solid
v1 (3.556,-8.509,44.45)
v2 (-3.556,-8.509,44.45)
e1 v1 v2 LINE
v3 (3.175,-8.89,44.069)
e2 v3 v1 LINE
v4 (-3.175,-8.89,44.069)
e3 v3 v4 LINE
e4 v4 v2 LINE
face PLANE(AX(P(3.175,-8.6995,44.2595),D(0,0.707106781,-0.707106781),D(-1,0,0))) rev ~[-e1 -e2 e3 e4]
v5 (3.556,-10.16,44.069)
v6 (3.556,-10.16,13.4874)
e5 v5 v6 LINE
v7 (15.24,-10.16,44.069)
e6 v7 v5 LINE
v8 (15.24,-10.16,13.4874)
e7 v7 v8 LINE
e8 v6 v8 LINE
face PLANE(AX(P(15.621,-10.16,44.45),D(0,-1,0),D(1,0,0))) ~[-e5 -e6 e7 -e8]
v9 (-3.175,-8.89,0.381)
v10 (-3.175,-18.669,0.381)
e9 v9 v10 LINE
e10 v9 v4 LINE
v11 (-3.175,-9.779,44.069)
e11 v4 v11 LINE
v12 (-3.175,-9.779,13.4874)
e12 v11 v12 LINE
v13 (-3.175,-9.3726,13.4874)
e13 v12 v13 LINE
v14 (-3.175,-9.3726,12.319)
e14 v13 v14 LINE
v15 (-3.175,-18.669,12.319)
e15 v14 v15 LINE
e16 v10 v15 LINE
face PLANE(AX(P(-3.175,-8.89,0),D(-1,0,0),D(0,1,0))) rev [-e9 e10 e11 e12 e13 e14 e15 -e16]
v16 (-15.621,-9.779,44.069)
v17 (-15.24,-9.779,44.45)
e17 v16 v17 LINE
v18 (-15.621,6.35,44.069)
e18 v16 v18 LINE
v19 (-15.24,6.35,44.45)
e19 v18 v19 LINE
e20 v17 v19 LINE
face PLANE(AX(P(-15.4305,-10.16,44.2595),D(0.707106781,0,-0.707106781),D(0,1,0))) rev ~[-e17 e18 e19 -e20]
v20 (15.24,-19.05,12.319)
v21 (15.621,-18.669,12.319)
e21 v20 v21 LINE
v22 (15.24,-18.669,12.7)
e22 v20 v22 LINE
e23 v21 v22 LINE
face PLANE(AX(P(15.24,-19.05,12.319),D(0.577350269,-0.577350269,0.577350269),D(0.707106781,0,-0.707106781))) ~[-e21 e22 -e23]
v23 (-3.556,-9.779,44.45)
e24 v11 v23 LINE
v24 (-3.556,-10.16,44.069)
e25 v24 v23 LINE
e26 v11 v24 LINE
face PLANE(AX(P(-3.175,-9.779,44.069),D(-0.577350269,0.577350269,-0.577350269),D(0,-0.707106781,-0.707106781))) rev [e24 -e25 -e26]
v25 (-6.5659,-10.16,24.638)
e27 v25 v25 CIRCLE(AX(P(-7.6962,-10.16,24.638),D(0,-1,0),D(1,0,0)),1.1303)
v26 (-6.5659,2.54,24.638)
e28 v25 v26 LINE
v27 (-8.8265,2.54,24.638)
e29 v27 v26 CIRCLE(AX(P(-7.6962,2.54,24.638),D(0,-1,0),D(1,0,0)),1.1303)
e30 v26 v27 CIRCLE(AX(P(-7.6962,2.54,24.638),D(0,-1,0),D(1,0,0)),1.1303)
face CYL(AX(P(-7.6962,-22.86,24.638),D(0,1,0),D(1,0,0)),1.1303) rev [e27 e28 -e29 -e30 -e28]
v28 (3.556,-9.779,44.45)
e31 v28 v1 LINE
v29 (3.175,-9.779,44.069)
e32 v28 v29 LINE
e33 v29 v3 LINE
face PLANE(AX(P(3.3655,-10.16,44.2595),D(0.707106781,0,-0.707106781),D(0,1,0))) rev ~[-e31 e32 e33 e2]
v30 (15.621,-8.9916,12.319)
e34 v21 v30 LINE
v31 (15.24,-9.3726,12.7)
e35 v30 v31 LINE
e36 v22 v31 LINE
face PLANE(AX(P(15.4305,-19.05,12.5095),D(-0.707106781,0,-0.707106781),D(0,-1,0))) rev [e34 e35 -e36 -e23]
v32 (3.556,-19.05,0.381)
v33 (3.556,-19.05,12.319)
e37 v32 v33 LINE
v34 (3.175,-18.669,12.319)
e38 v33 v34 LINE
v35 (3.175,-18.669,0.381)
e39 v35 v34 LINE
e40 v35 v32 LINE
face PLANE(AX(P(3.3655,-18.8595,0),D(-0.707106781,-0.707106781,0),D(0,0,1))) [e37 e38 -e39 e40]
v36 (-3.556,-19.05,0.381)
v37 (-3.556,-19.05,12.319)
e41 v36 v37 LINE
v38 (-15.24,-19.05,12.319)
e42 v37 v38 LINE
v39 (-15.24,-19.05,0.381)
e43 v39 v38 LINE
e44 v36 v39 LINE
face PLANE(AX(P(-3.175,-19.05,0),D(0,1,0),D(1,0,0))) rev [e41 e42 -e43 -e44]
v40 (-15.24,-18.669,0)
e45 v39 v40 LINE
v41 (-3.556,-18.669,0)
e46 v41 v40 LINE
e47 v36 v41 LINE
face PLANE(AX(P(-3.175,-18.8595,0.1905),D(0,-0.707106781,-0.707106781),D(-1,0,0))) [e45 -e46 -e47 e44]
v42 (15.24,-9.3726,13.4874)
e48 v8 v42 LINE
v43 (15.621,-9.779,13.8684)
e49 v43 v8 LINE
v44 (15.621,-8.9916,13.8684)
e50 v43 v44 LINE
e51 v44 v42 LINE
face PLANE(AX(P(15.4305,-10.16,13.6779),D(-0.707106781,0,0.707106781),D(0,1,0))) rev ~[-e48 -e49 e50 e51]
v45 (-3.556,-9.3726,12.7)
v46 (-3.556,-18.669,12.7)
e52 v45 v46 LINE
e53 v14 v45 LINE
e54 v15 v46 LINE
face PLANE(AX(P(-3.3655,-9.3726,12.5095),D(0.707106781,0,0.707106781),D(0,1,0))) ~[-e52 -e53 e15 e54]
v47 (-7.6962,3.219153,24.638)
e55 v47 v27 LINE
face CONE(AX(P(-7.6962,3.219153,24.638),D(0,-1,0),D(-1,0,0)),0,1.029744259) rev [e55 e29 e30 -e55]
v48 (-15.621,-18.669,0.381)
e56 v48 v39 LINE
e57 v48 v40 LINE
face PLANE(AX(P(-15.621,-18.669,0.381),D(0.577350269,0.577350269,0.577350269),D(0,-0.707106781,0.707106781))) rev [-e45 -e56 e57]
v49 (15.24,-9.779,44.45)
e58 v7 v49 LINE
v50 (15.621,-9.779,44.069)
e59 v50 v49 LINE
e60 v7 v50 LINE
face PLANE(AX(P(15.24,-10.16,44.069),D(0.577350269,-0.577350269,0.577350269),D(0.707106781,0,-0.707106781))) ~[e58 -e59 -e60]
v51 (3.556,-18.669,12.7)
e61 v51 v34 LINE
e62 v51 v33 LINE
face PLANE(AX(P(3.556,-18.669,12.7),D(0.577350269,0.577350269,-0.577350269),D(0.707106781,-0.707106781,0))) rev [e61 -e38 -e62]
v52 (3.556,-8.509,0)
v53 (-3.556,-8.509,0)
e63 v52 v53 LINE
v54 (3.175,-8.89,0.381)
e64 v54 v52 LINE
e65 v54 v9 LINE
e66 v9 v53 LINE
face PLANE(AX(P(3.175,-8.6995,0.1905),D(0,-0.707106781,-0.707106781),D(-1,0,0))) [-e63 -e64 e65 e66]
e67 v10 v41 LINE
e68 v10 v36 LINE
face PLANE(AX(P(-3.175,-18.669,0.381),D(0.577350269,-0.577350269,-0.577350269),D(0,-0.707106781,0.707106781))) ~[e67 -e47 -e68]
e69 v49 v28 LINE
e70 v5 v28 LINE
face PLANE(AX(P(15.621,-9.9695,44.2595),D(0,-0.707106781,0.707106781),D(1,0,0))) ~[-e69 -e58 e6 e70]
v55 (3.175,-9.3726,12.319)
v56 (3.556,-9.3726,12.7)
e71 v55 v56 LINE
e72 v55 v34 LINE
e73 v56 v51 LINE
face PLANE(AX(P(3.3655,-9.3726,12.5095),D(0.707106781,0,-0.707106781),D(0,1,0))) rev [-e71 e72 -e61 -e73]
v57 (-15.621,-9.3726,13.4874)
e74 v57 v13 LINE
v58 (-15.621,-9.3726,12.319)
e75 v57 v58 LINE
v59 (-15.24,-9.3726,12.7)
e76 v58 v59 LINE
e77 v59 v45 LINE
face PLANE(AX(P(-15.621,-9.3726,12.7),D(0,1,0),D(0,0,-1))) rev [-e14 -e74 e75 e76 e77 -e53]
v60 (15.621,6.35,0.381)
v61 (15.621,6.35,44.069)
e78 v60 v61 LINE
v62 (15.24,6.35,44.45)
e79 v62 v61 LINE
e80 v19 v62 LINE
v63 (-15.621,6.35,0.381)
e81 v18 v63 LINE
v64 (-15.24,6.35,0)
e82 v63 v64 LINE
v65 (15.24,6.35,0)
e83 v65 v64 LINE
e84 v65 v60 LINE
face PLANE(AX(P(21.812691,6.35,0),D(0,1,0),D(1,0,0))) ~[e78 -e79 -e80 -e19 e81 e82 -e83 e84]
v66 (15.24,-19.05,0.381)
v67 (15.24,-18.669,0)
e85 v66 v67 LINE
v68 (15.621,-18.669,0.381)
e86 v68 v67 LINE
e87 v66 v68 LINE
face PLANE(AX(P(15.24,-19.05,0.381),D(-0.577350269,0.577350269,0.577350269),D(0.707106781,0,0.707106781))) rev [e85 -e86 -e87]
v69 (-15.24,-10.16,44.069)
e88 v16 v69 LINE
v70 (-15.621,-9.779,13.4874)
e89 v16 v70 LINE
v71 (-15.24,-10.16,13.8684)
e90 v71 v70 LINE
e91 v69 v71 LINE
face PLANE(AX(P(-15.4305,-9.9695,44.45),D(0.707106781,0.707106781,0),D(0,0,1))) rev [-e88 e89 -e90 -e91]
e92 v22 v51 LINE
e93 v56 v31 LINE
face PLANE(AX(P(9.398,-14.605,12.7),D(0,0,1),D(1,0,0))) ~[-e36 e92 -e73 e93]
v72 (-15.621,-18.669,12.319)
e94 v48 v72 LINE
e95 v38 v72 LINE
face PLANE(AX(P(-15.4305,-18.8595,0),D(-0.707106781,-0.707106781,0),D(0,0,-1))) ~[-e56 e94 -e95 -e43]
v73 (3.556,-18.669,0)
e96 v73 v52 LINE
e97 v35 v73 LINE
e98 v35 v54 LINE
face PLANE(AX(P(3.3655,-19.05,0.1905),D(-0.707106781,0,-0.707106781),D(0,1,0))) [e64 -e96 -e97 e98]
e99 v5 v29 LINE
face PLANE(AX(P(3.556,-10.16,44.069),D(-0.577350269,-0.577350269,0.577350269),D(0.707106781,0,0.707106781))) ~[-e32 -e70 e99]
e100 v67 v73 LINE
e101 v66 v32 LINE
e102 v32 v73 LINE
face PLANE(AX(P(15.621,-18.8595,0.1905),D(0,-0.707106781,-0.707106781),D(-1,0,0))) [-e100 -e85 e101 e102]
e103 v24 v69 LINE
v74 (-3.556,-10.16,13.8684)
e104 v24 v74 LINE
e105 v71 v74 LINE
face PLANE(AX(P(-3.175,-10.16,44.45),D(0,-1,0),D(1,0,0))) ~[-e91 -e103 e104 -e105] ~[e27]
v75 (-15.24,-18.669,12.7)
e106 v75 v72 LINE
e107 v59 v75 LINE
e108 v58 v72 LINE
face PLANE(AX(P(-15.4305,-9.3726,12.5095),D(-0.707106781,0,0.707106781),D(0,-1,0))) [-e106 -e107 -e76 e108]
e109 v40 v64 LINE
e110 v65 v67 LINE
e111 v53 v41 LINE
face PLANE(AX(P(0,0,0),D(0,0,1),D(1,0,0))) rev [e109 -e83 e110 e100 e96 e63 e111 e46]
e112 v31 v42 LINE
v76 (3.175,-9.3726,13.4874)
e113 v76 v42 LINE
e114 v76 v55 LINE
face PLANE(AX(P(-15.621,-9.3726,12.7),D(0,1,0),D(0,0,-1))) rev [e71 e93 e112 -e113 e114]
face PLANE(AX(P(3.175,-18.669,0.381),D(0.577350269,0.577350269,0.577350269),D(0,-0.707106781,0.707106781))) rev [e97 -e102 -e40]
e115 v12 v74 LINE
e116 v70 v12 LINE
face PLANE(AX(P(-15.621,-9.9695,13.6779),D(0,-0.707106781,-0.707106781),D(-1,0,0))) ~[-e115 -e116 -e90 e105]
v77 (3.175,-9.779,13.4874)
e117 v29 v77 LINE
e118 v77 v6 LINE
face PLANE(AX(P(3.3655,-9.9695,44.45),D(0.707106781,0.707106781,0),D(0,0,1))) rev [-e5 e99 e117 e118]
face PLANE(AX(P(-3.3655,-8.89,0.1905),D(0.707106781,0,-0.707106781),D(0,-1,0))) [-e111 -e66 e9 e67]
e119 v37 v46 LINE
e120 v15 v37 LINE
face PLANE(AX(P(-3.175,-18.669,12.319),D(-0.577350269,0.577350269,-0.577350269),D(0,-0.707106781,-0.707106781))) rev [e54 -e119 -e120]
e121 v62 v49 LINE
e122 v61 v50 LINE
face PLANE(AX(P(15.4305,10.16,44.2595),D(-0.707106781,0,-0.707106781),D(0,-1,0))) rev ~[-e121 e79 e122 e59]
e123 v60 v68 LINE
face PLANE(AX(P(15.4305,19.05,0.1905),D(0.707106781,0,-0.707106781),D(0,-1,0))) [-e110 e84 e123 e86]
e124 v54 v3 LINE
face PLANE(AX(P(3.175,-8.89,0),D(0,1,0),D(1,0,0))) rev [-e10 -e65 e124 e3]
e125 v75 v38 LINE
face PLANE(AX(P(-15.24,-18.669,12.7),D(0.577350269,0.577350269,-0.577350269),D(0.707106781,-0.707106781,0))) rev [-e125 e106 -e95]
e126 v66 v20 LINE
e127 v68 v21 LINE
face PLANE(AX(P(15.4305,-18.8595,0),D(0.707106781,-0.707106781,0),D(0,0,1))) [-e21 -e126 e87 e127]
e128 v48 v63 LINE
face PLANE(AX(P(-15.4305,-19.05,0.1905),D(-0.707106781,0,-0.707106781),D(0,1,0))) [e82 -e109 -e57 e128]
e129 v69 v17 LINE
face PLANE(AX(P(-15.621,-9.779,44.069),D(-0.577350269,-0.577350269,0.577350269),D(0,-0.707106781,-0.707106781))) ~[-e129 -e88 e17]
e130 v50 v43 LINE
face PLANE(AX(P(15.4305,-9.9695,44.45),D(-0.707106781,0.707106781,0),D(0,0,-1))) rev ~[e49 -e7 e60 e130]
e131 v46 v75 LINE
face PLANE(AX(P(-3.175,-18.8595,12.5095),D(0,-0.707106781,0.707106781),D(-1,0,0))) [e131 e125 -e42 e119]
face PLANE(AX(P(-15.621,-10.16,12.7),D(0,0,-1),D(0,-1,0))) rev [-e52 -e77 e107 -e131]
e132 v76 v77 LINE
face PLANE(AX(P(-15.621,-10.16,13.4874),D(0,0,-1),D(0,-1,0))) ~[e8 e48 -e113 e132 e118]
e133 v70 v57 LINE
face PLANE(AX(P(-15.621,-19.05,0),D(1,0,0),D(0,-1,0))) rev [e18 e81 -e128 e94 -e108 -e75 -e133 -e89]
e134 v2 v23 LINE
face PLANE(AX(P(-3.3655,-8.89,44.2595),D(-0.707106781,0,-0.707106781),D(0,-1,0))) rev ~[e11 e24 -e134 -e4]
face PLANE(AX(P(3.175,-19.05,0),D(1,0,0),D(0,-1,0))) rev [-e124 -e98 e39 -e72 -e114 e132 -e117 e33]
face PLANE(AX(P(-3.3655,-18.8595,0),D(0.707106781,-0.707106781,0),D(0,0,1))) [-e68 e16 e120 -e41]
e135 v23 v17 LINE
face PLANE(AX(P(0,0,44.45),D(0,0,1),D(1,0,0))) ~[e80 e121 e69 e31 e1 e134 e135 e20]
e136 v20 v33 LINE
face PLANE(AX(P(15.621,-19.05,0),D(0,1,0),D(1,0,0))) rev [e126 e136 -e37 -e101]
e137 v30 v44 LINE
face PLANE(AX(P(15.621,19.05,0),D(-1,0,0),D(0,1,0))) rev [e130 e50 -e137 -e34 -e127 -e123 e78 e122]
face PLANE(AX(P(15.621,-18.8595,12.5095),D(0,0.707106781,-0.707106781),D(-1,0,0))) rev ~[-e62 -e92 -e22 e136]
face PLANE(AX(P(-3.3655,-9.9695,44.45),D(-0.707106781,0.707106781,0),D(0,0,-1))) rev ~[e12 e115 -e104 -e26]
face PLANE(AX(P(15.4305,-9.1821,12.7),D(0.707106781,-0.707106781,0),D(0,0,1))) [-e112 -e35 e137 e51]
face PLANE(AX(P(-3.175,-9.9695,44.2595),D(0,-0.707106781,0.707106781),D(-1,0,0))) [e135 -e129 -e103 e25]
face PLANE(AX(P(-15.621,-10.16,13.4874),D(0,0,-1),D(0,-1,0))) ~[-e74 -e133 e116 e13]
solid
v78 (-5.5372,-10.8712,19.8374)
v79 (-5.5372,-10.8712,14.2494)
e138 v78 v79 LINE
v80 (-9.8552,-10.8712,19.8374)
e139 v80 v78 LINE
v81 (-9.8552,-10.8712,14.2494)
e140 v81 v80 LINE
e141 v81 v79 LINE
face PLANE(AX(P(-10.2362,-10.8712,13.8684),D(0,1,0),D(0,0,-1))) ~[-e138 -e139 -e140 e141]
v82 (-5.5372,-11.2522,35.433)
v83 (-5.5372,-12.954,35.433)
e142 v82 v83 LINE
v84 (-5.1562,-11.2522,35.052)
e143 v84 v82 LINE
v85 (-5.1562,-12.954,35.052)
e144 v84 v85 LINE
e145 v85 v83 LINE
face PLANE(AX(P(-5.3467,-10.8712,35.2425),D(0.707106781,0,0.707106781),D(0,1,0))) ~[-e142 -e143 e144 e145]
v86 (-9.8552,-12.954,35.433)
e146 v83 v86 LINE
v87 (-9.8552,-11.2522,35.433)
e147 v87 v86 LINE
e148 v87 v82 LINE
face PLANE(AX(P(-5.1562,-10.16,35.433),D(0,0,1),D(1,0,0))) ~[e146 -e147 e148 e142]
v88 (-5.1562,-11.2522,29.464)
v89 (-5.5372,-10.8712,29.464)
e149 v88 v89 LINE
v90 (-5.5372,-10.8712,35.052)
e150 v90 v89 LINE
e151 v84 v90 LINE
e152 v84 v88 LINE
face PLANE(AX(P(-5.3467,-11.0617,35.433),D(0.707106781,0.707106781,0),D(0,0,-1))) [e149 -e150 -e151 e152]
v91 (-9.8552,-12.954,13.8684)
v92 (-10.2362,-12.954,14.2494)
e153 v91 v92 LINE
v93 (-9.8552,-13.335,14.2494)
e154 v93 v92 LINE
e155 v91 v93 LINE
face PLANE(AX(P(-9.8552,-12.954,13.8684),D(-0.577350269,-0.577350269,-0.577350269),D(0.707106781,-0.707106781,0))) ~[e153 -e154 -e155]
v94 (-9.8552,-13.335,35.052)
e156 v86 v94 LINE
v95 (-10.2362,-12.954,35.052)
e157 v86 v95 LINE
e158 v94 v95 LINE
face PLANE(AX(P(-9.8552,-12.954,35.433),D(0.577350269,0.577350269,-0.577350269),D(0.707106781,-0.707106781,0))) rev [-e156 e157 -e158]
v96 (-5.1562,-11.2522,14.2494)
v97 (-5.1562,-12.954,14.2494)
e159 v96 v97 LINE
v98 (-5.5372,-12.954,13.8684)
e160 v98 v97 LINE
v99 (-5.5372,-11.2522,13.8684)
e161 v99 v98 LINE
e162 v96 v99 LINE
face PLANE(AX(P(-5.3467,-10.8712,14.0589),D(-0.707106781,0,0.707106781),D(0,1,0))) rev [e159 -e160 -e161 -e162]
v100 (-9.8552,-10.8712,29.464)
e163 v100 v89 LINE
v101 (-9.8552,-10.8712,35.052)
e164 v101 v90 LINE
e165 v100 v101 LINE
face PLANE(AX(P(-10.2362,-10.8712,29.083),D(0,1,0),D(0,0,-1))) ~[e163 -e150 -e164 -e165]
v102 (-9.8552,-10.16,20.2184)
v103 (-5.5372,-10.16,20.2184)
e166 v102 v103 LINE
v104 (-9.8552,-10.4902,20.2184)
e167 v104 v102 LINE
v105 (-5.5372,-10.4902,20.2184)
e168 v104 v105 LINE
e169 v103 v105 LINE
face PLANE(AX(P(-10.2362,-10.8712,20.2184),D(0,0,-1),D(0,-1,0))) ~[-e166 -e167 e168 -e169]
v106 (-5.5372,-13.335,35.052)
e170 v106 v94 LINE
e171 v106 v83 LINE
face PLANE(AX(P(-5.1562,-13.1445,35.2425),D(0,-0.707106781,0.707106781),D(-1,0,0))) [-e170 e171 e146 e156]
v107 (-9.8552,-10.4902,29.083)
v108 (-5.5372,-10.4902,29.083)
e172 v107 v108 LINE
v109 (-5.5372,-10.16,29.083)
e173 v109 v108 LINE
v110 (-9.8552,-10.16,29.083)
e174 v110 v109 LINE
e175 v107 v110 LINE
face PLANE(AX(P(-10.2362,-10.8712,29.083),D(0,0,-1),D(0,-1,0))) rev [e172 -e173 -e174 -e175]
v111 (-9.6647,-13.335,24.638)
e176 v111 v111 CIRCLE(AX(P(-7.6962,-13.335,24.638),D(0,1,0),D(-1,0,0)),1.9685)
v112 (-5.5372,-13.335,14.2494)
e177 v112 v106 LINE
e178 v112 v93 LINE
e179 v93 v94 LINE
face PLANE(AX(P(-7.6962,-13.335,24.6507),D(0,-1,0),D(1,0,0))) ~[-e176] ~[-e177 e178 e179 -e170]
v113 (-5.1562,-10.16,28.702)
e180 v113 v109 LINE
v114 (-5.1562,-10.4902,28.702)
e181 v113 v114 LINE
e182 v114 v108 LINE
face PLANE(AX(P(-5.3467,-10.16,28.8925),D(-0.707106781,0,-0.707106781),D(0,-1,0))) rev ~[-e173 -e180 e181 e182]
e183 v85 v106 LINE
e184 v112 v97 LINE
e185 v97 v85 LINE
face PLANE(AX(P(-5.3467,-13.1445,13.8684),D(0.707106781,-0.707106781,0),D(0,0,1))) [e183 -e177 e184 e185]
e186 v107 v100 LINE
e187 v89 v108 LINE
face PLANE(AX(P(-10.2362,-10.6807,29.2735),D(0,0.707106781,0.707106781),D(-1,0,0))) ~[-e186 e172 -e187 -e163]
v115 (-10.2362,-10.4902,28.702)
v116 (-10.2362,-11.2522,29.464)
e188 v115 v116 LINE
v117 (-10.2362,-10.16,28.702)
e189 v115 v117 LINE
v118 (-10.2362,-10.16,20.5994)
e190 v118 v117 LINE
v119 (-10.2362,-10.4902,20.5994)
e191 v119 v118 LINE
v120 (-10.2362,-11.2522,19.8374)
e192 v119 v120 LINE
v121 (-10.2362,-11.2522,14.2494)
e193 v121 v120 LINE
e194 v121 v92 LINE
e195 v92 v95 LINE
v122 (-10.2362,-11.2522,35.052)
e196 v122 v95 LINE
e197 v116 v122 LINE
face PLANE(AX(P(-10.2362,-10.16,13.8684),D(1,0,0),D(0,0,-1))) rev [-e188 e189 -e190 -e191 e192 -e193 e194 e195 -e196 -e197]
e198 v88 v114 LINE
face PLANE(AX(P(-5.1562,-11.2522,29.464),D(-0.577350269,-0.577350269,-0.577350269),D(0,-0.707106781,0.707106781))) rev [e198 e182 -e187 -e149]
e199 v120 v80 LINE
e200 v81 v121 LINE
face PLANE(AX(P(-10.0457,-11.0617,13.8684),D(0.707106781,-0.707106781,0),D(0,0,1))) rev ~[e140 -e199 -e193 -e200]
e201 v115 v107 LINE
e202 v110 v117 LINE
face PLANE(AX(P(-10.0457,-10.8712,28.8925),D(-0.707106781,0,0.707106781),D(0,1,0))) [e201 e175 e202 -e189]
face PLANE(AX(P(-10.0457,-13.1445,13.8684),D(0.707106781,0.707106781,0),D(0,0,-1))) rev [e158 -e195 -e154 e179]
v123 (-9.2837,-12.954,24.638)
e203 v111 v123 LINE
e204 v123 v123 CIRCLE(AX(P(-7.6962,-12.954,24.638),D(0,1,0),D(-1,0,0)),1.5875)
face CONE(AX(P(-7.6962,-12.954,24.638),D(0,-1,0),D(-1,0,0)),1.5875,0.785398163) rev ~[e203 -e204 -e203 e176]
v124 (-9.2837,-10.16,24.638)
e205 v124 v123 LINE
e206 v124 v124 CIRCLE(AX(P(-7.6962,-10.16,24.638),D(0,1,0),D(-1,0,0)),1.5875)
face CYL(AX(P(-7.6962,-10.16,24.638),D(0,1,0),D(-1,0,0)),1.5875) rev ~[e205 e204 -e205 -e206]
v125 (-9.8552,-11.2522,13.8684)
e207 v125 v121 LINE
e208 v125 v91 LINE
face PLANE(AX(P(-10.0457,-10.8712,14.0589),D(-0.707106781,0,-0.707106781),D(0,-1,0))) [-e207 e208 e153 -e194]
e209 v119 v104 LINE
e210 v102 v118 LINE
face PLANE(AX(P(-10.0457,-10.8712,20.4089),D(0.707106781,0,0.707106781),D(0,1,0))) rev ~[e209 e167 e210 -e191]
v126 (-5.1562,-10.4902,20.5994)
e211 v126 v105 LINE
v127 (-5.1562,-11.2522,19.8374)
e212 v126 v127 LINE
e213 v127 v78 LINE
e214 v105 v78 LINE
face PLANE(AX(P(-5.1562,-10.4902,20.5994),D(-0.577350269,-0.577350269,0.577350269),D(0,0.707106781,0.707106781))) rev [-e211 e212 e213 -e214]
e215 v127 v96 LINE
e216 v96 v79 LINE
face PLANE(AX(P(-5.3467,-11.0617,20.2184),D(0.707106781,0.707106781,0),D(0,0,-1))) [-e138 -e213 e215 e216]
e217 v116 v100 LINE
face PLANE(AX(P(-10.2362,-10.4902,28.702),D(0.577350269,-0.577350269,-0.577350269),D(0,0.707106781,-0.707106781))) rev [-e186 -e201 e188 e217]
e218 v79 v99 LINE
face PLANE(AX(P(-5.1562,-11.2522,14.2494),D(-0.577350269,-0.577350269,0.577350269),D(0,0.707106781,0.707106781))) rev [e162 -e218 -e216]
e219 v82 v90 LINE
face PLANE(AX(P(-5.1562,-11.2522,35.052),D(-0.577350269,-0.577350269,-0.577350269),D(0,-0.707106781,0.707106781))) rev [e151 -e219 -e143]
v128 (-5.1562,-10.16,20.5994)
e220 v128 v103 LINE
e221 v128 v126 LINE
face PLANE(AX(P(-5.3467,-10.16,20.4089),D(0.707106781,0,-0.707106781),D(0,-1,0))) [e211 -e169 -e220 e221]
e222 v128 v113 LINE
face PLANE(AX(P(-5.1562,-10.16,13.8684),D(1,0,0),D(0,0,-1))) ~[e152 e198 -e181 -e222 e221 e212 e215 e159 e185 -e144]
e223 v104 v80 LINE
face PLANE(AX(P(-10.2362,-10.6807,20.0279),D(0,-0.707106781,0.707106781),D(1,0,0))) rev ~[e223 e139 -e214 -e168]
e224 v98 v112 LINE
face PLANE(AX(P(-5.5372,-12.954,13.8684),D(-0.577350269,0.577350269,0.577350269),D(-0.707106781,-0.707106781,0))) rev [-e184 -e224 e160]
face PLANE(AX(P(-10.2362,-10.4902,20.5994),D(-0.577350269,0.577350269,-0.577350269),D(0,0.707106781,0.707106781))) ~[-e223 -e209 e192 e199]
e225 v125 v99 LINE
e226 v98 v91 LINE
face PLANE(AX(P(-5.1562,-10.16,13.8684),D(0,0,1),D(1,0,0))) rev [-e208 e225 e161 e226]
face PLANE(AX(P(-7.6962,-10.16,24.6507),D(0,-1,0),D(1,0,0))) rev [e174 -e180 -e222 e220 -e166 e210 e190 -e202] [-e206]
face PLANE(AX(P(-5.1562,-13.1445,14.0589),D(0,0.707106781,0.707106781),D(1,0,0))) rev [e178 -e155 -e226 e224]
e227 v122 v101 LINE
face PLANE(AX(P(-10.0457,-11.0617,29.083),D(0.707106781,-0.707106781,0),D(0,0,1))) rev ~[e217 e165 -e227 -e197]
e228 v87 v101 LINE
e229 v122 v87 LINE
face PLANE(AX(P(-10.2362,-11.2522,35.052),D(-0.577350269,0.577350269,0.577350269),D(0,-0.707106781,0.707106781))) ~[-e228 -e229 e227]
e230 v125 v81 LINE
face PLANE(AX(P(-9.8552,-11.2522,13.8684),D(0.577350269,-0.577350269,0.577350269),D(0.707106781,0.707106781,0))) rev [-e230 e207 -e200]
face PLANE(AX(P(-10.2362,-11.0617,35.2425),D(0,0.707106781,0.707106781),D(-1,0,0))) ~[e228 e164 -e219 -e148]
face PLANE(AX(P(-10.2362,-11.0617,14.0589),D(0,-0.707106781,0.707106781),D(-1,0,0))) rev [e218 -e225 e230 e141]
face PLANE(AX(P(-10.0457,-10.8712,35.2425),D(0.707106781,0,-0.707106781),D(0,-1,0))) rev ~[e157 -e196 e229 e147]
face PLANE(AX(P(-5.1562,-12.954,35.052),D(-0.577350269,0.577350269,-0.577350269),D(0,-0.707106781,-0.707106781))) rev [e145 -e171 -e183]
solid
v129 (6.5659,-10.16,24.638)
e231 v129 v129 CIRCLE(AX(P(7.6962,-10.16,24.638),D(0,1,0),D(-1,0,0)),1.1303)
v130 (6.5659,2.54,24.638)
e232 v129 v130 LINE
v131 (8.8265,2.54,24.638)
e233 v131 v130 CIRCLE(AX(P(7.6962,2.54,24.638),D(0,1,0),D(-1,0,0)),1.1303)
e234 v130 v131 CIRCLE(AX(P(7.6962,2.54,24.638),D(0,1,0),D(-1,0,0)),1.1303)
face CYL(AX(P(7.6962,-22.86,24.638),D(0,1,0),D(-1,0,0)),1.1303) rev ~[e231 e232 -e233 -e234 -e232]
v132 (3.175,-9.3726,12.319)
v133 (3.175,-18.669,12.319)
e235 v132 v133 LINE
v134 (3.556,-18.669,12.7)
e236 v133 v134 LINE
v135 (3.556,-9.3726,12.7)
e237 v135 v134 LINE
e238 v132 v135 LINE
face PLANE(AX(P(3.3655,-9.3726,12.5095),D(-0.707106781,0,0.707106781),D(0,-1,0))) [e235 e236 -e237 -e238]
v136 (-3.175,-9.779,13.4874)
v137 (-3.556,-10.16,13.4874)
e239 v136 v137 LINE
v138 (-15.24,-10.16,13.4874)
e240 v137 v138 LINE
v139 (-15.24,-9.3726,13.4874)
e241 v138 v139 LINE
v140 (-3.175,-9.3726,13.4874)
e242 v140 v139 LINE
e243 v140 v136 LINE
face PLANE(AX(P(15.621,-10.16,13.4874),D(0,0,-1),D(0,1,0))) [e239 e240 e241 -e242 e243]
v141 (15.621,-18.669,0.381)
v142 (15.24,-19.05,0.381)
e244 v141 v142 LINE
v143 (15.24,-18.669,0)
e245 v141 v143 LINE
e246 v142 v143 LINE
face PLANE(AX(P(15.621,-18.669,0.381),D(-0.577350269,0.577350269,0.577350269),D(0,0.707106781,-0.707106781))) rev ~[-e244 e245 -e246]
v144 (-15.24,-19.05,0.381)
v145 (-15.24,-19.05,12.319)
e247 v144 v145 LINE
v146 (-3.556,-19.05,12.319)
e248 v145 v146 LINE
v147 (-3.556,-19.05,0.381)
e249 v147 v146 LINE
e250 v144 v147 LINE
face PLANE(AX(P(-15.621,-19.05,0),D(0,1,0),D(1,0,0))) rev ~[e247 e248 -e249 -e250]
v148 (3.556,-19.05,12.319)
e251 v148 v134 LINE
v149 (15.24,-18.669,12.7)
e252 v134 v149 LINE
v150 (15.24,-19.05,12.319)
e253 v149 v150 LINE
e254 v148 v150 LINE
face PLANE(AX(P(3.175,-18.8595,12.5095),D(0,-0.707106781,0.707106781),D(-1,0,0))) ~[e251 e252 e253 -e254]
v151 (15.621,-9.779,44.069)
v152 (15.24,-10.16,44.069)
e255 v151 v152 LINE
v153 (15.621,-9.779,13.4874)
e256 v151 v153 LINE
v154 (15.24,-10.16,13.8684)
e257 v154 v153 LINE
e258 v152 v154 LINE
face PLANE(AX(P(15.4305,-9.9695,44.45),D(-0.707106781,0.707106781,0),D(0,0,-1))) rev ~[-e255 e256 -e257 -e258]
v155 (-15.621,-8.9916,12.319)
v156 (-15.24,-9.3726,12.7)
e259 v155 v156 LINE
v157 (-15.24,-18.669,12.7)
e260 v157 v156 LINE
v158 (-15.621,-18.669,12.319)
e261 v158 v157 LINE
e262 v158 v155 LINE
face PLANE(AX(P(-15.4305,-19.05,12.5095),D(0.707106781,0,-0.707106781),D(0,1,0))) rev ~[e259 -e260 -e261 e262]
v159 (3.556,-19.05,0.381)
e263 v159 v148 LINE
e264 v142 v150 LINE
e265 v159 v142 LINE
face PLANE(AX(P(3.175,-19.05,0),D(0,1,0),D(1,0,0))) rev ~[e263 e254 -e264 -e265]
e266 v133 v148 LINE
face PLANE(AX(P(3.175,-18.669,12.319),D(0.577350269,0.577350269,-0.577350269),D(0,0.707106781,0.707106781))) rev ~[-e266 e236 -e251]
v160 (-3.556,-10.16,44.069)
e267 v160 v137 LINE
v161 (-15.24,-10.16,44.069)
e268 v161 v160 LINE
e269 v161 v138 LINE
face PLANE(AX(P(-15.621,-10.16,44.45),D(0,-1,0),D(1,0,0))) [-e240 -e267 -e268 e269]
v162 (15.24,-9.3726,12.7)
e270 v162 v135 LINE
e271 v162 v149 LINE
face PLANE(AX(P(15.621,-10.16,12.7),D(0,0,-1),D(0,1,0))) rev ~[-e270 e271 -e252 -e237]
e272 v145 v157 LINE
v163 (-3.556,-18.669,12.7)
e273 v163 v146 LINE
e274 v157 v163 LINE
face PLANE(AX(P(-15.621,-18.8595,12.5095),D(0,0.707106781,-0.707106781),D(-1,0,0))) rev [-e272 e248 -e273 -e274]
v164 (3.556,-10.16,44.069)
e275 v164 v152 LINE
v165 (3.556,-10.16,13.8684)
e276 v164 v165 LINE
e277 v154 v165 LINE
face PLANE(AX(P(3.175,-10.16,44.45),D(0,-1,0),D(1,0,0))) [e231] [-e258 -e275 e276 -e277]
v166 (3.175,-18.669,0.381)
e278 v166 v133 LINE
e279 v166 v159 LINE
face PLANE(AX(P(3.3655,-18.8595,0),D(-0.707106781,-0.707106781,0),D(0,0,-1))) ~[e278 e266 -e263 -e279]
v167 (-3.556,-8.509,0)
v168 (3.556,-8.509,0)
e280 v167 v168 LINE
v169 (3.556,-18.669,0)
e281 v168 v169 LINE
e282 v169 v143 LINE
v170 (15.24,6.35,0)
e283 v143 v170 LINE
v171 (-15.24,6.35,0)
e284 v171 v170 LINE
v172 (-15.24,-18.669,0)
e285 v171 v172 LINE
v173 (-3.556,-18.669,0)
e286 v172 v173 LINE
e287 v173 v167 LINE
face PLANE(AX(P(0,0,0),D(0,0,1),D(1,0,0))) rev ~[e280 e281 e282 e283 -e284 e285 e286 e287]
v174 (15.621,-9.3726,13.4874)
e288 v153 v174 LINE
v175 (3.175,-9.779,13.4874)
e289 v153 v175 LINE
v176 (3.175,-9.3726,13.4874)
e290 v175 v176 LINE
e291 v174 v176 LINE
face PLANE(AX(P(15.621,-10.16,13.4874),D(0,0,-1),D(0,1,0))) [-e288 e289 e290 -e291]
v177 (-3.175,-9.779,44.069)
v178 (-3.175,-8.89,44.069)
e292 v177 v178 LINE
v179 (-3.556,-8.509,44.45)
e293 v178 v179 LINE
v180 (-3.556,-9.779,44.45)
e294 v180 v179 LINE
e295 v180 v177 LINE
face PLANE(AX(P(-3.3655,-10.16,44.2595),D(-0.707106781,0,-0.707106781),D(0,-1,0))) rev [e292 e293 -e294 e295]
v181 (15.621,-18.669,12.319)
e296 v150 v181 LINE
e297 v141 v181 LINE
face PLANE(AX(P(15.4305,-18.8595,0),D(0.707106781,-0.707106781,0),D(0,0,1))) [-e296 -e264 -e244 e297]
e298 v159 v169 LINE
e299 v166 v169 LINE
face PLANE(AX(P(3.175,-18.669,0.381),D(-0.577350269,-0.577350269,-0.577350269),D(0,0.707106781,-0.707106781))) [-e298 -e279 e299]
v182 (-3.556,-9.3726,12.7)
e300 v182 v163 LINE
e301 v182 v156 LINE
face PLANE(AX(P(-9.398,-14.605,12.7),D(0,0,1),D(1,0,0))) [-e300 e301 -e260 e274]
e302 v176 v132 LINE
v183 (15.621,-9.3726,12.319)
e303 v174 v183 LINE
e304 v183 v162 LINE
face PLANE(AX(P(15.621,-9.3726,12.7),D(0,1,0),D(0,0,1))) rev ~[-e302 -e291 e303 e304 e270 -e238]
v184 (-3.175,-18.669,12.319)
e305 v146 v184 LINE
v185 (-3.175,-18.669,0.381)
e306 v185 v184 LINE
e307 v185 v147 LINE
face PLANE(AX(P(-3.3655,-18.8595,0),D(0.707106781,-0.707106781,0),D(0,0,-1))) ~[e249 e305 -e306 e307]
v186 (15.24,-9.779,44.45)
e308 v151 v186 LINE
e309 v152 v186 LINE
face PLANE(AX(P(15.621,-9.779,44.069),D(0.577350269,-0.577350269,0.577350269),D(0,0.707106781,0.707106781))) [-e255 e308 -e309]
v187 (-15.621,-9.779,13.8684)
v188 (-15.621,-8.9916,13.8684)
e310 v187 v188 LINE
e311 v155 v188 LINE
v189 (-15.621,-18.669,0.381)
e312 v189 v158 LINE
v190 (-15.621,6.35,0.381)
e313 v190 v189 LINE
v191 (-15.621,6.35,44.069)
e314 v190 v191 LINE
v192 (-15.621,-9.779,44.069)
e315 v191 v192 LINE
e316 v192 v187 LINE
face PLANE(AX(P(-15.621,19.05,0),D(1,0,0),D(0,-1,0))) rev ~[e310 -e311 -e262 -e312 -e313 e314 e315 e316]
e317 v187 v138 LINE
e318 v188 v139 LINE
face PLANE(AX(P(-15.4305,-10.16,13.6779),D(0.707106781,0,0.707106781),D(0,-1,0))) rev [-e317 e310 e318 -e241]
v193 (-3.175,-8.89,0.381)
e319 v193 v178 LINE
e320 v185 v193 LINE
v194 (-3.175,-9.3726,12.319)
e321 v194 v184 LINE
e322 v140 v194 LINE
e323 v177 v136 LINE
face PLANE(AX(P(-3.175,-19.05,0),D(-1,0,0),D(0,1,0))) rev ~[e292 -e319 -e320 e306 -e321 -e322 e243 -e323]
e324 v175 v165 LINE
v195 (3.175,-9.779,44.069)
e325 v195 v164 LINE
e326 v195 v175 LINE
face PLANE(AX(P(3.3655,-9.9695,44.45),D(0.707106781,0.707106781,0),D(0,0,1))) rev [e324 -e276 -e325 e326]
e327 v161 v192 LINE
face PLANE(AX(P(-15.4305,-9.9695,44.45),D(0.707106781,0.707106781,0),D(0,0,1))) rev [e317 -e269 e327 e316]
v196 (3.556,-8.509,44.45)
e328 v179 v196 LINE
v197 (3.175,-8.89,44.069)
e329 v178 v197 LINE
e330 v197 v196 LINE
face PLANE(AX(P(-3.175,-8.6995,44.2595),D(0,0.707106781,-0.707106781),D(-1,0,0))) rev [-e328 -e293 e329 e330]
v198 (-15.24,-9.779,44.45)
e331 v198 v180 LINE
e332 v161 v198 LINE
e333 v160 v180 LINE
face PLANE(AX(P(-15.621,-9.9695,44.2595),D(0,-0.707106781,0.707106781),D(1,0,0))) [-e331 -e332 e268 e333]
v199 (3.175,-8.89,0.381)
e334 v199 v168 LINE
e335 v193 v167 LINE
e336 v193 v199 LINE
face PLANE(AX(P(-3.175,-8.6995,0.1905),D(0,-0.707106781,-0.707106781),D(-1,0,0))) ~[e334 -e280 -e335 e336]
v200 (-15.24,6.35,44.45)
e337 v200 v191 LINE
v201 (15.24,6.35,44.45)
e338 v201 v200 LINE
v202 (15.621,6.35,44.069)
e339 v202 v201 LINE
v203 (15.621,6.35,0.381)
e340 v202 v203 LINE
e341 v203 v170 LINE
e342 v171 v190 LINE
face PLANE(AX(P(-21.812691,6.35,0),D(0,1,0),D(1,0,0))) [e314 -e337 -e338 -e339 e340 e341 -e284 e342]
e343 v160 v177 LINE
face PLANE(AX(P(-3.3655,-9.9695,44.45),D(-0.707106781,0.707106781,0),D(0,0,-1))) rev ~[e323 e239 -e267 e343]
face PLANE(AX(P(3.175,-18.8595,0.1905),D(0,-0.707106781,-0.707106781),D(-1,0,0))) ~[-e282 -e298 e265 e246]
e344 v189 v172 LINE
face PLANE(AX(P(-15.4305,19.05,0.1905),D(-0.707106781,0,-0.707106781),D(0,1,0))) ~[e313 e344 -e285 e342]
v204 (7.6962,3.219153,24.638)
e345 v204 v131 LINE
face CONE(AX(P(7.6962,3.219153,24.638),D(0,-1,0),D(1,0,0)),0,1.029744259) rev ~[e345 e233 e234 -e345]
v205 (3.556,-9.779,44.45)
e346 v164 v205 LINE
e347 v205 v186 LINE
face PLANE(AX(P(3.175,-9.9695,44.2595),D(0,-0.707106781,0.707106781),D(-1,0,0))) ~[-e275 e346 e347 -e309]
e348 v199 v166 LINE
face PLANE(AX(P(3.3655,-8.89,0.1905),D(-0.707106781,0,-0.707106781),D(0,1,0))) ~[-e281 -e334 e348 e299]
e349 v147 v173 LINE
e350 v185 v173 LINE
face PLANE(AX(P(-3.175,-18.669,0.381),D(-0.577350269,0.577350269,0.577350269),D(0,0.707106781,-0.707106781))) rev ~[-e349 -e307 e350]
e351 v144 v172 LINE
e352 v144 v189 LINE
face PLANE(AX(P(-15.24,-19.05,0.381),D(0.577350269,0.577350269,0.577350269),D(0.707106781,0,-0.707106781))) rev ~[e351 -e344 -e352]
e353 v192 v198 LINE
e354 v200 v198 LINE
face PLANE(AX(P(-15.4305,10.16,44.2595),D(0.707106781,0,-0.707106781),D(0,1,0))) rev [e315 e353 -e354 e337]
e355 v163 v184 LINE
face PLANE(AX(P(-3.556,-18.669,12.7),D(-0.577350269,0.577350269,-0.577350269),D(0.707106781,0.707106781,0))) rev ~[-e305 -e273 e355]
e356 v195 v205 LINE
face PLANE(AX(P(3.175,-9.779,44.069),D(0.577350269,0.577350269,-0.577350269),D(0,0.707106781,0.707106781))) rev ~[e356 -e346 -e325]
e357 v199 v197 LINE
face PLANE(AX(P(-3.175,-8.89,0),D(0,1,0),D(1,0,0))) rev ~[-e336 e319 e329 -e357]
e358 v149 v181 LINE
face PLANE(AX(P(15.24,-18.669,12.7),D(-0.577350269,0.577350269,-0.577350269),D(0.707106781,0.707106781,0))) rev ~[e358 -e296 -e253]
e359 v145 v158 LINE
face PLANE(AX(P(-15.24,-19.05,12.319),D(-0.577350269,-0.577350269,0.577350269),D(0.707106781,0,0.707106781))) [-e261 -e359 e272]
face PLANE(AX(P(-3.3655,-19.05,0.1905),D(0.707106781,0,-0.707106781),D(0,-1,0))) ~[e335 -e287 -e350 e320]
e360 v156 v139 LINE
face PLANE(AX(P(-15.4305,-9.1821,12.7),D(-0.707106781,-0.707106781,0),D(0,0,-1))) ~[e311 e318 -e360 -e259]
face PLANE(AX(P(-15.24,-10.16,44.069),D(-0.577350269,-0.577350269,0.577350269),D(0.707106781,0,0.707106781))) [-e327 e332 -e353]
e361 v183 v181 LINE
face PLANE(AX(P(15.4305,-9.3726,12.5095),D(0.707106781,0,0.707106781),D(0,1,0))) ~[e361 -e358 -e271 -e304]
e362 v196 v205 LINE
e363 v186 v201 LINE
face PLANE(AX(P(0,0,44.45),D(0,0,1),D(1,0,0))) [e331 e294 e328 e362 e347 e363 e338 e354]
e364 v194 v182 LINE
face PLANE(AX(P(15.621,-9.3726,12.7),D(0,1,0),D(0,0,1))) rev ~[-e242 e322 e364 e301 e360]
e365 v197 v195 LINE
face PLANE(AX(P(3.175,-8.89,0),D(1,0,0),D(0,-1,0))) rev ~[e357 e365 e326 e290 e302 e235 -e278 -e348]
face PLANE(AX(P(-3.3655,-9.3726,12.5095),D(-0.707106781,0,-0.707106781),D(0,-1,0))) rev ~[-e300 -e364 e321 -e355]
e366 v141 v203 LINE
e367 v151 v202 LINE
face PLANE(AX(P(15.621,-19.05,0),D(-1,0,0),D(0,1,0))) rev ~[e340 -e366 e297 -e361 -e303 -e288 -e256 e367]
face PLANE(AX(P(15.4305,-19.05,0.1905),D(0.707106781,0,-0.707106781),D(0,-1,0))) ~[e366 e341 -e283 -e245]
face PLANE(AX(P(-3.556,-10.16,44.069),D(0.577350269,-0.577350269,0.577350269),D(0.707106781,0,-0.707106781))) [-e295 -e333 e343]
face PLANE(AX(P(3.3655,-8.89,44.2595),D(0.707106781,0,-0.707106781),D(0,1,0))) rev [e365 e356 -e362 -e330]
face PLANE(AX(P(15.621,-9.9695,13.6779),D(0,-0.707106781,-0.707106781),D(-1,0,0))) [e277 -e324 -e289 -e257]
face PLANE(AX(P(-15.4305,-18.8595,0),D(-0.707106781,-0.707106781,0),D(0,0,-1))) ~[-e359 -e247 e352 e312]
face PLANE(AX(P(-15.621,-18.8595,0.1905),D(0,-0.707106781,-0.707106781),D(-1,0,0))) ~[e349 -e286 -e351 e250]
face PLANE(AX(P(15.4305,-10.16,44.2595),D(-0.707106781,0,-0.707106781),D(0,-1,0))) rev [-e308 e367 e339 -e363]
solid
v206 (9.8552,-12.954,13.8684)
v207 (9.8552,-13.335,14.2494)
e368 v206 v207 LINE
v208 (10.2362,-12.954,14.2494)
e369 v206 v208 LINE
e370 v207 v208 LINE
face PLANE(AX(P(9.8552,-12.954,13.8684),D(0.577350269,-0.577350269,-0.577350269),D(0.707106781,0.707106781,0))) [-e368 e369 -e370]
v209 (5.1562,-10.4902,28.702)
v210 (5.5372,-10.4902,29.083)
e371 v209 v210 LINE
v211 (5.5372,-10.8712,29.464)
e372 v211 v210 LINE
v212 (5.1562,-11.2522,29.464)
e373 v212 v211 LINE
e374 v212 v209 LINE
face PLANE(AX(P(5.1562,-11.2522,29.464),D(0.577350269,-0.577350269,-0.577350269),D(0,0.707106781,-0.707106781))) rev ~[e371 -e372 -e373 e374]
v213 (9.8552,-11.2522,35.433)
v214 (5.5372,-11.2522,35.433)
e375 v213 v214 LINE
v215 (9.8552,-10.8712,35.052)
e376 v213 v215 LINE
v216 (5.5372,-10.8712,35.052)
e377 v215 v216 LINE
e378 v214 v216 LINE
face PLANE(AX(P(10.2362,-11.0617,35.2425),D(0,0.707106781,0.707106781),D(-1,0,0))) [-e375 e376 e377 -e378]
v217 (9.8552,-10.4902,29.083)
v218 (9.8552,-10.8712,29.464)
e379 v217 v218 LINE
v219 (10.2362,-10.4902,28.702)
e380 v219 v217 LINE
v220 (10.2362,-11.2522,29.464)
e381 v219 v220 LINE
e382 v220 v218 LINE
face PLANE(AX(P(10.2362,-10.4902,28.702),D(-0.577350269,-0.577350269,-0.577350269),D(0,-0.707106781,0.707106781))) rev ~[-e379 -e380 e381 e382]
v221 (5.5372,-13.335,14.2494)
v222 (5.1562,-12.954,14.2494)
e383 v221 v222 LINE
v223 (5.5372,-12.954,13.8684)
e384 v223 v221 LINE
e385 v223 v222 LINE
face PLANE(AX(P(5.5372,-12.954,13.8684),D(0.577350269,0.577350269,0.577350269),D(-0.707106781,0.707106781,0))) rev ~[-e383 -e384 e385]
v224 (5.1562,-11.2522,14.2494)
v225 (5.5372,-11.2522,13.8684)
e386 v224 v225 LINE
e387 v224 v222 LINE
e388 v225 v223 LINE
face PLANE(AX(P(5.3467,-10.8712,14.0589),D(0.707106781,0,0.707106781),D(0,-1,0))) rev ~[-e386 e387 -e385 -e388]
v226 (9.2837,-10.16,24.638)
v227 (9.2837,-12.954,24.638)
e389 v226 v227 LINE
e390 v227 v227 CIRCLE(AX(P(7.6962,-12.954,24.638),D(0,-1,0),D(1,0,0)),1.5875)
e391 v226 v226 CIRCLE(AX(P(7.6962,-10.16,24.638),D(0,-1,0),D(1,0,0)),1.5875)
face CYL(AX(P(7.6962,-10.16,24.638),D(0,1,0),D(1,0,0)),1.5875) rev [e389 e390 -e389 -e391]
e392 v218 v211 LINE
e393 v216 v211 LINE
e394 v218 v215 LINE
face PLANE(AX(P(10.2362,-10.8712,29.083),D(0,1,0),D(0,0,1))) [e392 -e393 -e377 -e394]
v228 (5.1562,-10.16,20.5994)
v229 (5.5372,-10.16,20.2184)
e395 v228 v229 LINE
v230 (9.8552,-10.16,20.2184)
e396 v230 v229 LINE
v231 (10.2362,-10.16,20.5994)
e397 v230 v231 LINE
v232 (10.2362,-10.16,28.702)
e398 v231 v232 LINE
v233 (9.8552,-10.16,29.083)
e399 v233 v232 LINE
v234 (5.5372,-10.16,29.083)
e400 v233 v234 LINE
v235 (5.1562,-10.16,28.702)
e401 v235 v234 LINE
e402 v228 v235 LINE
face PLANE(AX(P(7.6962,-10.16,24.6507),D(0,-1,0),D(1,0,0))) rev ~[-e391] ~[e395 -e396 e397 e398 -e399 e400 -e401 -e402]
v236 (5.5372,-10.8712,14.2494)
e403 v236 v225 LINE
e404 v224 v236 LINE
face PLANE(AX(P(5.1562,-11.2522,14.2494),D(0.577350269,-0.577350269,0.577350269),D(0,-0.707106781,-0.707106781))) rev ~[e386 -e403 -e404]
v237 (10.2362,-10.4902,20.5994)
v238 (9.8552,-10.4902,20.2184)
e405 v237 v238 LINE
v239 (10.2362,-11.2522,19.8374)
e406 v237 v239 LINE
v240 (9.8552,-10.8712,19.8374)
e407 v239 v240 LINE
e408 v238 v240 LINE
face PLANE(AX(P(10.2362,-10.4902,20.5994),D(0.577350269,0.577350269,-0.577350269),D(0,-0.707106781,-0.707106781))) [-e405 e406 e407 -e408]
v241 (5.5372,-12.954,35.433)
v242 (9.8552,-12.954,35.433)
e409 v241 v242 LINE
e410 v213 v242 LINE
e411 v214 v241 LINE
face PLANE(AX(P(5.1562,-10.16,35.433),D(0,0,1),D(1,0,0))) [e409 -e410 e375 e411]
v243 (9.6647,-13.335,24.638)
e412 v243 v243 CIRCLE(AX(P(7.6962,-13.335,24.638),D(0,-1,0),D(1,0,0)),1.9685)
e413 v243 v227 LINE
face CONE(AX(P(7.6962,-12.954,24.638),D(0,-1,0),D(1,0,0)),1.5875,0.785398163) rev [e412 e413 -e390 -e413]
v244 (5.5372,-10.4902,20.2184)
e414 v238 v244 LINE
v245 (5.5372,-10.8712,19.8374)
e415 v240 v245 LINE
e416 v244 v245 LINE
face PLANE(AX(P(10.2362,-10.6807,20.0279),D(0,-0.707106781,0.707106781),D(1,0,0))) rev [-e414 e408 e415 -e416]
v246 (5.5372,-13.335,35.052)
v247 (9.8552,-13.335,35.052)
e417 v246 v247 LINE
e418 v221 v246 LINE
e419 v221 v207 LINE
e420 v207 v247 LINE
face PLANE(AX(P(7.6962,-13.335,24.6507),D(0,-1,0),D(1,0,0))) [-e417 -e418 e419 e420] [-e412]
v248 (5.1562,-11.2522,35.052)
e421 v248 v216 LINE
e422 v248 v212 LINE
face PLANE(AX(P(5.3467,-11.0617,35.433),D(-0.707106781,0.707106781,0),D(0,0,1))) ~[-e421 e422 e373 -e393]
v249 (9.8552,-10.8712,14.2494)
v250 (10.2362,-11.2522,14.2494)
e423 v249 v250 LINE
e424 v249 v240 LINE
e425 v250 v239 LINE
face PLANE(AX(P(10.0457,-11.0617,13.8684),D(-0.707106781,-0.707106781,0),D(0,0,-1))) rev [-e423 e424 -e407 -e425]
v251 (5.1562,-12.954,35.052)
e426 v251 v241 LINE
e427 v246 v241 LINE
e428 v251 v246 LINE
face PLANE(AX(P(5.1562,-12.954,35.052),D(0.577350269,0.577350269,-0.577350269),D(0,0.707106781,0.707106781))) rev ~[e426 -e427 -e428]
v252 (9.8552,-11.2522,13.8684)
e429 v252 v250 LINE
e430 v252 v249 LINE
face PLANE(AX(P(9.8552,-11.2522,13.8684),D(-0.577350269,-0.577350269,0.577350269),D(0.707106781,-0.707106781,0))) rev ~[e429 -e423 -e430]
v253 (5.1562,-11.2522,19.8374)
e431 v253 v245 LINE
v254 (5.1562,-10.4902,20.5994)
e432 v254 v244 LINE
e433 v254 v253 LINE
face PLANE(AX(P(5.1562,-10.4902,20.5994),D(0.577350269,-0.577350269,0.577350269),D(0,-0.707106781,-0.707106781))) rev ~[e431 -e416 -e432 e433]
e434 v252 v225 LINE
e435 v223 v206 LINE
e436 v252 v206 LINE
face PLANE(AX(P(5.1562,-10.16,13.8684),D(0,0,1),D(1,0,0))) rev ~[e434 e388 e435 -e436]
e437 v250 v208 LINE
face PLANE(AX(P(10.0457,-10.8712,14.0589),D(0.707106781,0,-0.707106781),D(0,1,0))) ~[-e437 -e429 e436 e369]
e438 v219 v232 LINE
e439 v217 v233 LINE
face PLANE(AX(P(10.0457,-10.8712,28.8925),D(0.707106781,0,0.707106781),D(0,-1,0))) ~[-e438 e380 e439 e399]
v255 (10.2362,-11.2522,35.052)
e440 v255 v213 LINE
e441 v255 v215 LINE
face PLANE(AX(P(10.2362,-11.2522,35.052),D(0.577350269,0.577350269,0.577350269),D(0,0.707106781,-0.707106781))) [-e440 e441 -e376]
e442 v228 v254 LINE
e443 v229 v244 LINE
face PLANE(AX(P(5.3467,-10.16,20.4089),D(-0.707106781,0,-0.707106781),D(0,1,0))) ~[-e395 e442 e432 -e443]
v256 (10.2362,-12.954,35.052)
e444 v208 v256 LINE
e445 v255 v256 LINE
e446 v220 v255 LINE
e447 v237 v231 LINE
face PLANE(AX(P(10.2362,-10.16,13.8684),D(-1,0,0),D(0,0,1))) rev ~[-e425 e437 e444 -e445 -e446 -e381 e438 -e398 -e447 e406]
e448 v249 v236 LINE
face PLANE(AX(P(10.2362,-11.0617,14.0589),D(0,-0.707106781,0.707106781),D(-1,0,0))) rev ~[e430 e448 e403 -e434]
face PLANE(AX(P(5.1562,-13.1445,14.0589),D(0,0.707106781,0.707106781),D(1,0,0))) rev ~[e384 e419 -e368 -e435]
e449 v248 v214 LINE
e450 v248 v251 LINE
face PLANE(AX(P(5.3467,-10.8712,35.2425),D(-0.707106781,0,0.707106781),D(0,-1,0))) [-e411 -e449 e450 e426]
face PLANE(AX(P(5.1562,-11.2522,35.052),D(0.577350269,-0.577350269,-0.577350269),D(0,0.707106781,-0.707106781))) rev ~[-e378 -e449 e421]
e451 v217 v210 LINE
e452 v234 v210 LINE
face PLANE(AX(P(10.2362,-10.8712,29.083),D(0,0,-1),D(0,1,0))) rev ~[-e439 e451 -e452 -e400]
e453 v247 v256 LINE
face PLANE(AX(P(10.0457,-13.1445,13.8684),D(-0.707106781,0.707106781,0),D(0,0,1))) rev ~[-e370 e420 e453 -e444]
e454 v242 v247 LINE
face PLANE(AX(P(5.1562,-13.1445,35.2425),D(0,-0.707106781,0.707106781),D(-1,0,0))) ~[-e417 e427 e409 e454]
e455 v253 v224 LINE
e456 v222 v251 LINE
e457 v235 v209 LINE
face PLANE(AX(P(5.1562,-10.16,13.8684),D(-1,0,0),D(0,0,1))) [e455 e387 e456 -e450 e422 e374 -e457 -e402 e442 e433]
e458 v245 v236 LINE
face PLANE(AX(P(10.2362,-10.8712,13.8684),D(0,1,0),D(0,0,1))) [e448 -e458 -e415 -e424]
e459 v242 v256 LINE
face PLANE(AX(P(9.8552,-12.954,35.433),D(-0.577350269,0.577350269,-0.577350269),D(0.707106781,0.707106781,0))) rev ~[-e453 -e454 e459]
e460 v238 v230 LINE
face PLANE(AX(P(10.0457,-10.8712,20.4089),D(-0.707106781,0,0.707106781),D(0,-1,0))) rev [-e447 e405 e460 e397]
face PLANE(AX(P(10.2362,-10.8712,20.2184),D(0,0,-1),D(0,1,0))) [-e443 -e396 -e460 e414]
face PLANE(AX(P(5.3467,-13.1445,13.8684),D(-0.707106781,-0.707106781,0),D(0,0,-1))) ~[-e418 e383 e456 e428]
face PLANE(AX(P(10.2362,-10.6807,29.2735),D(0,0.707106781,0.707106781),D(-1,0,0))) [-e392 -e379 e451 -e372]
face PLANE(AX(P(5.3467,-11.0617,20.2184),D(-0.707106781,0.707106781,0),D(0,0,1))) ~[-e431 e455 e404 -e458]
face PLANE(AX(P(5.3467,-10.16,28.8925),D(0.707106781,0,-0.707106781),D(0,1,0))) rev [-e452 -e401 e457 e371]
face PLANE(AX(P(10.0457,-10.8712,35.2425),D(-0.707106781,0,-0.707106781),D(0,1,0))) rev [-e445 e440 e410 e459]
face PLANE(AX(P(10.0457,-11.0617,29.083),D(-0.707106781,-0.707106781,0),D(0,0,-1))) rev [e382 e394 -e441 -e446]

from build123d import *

# Parameters (mm, degrees)
F1_DEPTH  = 44.45
F2_W      = 12.446
F2_H      = 8.89
F3_DEPTH  = 31.75
F4_W      = 0.7874
F4_H      = 0.7874
F5_DEPTH  = 31.243
F6_SIZE   = 0.381
F8_D      = 2.2606
F8_DEPTH  = 12.7
F8_TIP    = 0.6791527577
F9_W      = 5.08
F9_H      = 21.5646
F9_R      = 1.5875
F10_DEPTH = 3.175
F11_W     = 0.7112
F11_H     = 6.35
F12_DEPTH = 25.8582
F13_SIZE  = 0.381
F14_W     = 42.4513401179
F14_H     = 23.650664404
F15_DEPTH = 44.451


with BuildPart() as f1:
    # F0 (on Top) → F1 (new body)
    with BuildSketch(Plane.XY):
        Polygon((15.621, -19.05), (15.621, 19.05), (3.175, 19.05), (3.175, 8.89), (-3.175, 8.89), (-3.175, 19.05), (-15.621, 19.05), (-15.621, -19.05), (-3.175, -19.05), (-3.175, -8.89), (3.175, -8.89), (3.175, -19.05), align=None)
    extrude(amount=F1_DEPTH)

    # F2 (on face) → F3 (cut)
    with BuildSketch(Plane.XY.offset(44.45)):
        with Locations((-9.398, -14.605)):
            Rectangle(F2_W, F2_H)
        with Locations((9.398, -14.605)):
            Rectangle(F2_W, F2_H)
        with Locations((9.398, 14.605)):
            Rectangle(F2_W, F2_H)
        with Locations((-9.398, 14.605)):
            Rectangle(F2_W, F2_H)
    extrude(amount=-F3_DEPTH, mode=Mode.SUBTRACT)

    # F4 (on face) → F5 (cut, through all)
    with BuildSketch(Plane.YZ.offset(15.621)):
        with Locations((-9.7663, 13.0937)):
            Rectangle(F4_W, F4_H)
        with Locations((9.7663, 13.0937)):
            Rectangle(F4_W, F4_H)
    extrude(amount=-F5_DEPTH, mode=Mode.SUBTRACT)

    # F6
    f6_edges = [f1.edges().sort_by_distance(p)[0] for p in [
        (9.398, 10.16, 44.45),
        (15.621, 10.16, 28.9687),
        (9.398, 10.16, 13.4874),
        (3.175, 10.16, 28.9687),
        (-9.398, 10.16, 44.45),
        (-3.175, 10.16, 28.9687),
        (-9.398, 10.16, 13.4874),
        (-15.621, 10.16, 28.9687),
        (-9.398, 19.05, 0),
        (-15.621, 19.05, 6.35),
        (-9.398, 19.05, 12.7),
        (-3.175, 19.05, 6.35),
        (9.398, 19.05, 0),
        (3.175, 19.05, 6.35),
        (9.398, 19.05, 12.7),
        (15.621, 19.05, 6.35),
        (-15.621, 0, 0),
        (-15.621, 14.2113, 12.7),
        (-15.621, 9.3726, 13.0937),
        (-15.621, 9.7663, 13.4874),
        (-15.621, 0, 44.45),
        (-15.621, -10.16, 28.9687),
        (-15.621, -9.7663, 13.4874),
        (-15.621, -9.3726, 13.0937),
        (-15.621, -14.2113, 12.7),
        (-15.621, -19.05, 6.35),
        (9.398, -10.16, 44.45),
        (3.175, -10.16, 28.9687),
        (9.398, -10.16, 13.4874),
        (15.621, -10.16, 28.9687),
        (9.398, -19.05, 0),
        (15.621, -19.05, 6.35),
        (9.398, -19.05, 12.7),
        (3.175, -19.05, 6.35),
        (-9.398, -19.05, 0),
        (-3.175, -19.05, 6.35),
        (-9.398, -19.05, 12.7),
        (15.621, 0, 0),
        (3.175, 13.97, 0),
        (0, 8.89, 0),
        (-3.175, 13.97, 0),
        (-3.175, -13.97, 0),
        (0, -8.89, 0),
        (3.175, -13.97, 0),
        (3.175, -9.525, 44.45),
        (0, -8.89, 44.45),
        (-3.175, -9.525, 44.45),
        (-9.398, -10.16, 44.45),
        (-3.175, 9.525, 44.45),
        (0, 8.89, 44.45),
        (3.175, 9.525, 44.45),
        (15.621, 0, 44.45),
        (-3.175, -14.2113, 12.7),
        (3.175, -14.2113, 12.7),
        (3.175, 14.2113, 12.7),
        (-3.175, 14.2113, 12.7),
        (15.621, -14.2113, 12.7),
        (-3.175, -10.16, 28.9687),
        (15.621, 14.2113, 12.7),
    ]]
    chamfer(f6_edges, length=F6_SIZE)

    # F8
    with Locations(Plane.XZ.offset(10.16)):
        with Locations((7.6962, 24.638)):
            Hole(F8_D / 2, depth=F8_DEPTH)
            with Locations((0, 0, -(F8_DEPTH + F8_TIP / 2))):  # 118° drill point
                Cone(0, F8_D / 2, F8_TIP, mode=Mode.SUBTRACT)

    # F14 (on face) → F15 (cut, through all)
    with BuildSketch(Plane(origin=(0, 0, 0), x_dir=(1, 0, 0), z_dir=(0, 0, -1))):
        with Locations((-0.5870210007, -18.175332202)):
            Rectangle(F14_W, F14_H)
    extrude(amount=-F15_DEPTH, mode=Mode.SUBTRACT)


with BuildPart() as f10:
    # F9 (on face) → F10 (new body)
    with BuildSketch(Plane.XZ.offset(10.16)):
        with Locations((7.6962, 24.6507)):
            Rectangle(F9_W, F9_H)
        with Locations((7.6962, 24.638)):
            Circle(F9_R, mode=Mode.SUBTRACT)
    extrude(amount=F10_DEPTH)

    # F11 (on face) → F12 (cut, through all)
    with BuildSketch(Plane.YZ.offset(10.2362)):
        with Locations((-10.5156, 17.0434)):
            Rectangle(F11_W, F11_H)
        with Locations((-10.5156, 32.258)):
            Rectangle(F11_W, F11_H)
    extrude(amount=-F12_DEPTH, mode=Mode.SUBTRACT)

    # F13
    f13_edges = [f10.edges().sort_by_distance(p)[0] for p in [
        (10.2362, -13.335, 24.6507),
        (7.6962, -13.335, 35.433),
        (5.1562, -13.335, 24.6507),
        (7.6962, -13.335, 13.8684),
        (6.1087, -13.335, 24.638),
        (7.6962, -10.8712, 35.433),
        (5.1562, -12.1031, 35.433),
        (10.2362, -12.1031, 35.433),
        (10.2362, -10.8712, 17.0434),
        (7.6962, -10.8712, 13.8684),
        (5.1562, -10.8712, 17.0434),
        (7.6962, -10.8712, 20.2184),
        (10.2362, -10.8712, 32.258),
        (7.6962, -10.8712, 29.083),
        (5.1562, -10.8712, 32.258),
        (10.2362, -10.5156, 20.2184),
        (10.2362, -10.5156, 29.083),
        (10.2362, -12.1031, 13.8684),
        (5.1562, -10.5156, 20.2184),
        (5.1562, -10.5156, 29.083),
        (5.1562, -12.1031, 13.8684),
    ]]
    chamfer(f13_edges, length=F13_SIZE)


with BuildPart() as f16_1:
    # F16: instance of F10
    add(f10.part.mirror(Plane.YZ))


with BuildPart() as f16_2:
    # F16: instance of F1
    add(f1.part.mirror(Plane.YZ))


solid = Compound([f1.part, f10.part, f16_1.part, f16_2.part])
